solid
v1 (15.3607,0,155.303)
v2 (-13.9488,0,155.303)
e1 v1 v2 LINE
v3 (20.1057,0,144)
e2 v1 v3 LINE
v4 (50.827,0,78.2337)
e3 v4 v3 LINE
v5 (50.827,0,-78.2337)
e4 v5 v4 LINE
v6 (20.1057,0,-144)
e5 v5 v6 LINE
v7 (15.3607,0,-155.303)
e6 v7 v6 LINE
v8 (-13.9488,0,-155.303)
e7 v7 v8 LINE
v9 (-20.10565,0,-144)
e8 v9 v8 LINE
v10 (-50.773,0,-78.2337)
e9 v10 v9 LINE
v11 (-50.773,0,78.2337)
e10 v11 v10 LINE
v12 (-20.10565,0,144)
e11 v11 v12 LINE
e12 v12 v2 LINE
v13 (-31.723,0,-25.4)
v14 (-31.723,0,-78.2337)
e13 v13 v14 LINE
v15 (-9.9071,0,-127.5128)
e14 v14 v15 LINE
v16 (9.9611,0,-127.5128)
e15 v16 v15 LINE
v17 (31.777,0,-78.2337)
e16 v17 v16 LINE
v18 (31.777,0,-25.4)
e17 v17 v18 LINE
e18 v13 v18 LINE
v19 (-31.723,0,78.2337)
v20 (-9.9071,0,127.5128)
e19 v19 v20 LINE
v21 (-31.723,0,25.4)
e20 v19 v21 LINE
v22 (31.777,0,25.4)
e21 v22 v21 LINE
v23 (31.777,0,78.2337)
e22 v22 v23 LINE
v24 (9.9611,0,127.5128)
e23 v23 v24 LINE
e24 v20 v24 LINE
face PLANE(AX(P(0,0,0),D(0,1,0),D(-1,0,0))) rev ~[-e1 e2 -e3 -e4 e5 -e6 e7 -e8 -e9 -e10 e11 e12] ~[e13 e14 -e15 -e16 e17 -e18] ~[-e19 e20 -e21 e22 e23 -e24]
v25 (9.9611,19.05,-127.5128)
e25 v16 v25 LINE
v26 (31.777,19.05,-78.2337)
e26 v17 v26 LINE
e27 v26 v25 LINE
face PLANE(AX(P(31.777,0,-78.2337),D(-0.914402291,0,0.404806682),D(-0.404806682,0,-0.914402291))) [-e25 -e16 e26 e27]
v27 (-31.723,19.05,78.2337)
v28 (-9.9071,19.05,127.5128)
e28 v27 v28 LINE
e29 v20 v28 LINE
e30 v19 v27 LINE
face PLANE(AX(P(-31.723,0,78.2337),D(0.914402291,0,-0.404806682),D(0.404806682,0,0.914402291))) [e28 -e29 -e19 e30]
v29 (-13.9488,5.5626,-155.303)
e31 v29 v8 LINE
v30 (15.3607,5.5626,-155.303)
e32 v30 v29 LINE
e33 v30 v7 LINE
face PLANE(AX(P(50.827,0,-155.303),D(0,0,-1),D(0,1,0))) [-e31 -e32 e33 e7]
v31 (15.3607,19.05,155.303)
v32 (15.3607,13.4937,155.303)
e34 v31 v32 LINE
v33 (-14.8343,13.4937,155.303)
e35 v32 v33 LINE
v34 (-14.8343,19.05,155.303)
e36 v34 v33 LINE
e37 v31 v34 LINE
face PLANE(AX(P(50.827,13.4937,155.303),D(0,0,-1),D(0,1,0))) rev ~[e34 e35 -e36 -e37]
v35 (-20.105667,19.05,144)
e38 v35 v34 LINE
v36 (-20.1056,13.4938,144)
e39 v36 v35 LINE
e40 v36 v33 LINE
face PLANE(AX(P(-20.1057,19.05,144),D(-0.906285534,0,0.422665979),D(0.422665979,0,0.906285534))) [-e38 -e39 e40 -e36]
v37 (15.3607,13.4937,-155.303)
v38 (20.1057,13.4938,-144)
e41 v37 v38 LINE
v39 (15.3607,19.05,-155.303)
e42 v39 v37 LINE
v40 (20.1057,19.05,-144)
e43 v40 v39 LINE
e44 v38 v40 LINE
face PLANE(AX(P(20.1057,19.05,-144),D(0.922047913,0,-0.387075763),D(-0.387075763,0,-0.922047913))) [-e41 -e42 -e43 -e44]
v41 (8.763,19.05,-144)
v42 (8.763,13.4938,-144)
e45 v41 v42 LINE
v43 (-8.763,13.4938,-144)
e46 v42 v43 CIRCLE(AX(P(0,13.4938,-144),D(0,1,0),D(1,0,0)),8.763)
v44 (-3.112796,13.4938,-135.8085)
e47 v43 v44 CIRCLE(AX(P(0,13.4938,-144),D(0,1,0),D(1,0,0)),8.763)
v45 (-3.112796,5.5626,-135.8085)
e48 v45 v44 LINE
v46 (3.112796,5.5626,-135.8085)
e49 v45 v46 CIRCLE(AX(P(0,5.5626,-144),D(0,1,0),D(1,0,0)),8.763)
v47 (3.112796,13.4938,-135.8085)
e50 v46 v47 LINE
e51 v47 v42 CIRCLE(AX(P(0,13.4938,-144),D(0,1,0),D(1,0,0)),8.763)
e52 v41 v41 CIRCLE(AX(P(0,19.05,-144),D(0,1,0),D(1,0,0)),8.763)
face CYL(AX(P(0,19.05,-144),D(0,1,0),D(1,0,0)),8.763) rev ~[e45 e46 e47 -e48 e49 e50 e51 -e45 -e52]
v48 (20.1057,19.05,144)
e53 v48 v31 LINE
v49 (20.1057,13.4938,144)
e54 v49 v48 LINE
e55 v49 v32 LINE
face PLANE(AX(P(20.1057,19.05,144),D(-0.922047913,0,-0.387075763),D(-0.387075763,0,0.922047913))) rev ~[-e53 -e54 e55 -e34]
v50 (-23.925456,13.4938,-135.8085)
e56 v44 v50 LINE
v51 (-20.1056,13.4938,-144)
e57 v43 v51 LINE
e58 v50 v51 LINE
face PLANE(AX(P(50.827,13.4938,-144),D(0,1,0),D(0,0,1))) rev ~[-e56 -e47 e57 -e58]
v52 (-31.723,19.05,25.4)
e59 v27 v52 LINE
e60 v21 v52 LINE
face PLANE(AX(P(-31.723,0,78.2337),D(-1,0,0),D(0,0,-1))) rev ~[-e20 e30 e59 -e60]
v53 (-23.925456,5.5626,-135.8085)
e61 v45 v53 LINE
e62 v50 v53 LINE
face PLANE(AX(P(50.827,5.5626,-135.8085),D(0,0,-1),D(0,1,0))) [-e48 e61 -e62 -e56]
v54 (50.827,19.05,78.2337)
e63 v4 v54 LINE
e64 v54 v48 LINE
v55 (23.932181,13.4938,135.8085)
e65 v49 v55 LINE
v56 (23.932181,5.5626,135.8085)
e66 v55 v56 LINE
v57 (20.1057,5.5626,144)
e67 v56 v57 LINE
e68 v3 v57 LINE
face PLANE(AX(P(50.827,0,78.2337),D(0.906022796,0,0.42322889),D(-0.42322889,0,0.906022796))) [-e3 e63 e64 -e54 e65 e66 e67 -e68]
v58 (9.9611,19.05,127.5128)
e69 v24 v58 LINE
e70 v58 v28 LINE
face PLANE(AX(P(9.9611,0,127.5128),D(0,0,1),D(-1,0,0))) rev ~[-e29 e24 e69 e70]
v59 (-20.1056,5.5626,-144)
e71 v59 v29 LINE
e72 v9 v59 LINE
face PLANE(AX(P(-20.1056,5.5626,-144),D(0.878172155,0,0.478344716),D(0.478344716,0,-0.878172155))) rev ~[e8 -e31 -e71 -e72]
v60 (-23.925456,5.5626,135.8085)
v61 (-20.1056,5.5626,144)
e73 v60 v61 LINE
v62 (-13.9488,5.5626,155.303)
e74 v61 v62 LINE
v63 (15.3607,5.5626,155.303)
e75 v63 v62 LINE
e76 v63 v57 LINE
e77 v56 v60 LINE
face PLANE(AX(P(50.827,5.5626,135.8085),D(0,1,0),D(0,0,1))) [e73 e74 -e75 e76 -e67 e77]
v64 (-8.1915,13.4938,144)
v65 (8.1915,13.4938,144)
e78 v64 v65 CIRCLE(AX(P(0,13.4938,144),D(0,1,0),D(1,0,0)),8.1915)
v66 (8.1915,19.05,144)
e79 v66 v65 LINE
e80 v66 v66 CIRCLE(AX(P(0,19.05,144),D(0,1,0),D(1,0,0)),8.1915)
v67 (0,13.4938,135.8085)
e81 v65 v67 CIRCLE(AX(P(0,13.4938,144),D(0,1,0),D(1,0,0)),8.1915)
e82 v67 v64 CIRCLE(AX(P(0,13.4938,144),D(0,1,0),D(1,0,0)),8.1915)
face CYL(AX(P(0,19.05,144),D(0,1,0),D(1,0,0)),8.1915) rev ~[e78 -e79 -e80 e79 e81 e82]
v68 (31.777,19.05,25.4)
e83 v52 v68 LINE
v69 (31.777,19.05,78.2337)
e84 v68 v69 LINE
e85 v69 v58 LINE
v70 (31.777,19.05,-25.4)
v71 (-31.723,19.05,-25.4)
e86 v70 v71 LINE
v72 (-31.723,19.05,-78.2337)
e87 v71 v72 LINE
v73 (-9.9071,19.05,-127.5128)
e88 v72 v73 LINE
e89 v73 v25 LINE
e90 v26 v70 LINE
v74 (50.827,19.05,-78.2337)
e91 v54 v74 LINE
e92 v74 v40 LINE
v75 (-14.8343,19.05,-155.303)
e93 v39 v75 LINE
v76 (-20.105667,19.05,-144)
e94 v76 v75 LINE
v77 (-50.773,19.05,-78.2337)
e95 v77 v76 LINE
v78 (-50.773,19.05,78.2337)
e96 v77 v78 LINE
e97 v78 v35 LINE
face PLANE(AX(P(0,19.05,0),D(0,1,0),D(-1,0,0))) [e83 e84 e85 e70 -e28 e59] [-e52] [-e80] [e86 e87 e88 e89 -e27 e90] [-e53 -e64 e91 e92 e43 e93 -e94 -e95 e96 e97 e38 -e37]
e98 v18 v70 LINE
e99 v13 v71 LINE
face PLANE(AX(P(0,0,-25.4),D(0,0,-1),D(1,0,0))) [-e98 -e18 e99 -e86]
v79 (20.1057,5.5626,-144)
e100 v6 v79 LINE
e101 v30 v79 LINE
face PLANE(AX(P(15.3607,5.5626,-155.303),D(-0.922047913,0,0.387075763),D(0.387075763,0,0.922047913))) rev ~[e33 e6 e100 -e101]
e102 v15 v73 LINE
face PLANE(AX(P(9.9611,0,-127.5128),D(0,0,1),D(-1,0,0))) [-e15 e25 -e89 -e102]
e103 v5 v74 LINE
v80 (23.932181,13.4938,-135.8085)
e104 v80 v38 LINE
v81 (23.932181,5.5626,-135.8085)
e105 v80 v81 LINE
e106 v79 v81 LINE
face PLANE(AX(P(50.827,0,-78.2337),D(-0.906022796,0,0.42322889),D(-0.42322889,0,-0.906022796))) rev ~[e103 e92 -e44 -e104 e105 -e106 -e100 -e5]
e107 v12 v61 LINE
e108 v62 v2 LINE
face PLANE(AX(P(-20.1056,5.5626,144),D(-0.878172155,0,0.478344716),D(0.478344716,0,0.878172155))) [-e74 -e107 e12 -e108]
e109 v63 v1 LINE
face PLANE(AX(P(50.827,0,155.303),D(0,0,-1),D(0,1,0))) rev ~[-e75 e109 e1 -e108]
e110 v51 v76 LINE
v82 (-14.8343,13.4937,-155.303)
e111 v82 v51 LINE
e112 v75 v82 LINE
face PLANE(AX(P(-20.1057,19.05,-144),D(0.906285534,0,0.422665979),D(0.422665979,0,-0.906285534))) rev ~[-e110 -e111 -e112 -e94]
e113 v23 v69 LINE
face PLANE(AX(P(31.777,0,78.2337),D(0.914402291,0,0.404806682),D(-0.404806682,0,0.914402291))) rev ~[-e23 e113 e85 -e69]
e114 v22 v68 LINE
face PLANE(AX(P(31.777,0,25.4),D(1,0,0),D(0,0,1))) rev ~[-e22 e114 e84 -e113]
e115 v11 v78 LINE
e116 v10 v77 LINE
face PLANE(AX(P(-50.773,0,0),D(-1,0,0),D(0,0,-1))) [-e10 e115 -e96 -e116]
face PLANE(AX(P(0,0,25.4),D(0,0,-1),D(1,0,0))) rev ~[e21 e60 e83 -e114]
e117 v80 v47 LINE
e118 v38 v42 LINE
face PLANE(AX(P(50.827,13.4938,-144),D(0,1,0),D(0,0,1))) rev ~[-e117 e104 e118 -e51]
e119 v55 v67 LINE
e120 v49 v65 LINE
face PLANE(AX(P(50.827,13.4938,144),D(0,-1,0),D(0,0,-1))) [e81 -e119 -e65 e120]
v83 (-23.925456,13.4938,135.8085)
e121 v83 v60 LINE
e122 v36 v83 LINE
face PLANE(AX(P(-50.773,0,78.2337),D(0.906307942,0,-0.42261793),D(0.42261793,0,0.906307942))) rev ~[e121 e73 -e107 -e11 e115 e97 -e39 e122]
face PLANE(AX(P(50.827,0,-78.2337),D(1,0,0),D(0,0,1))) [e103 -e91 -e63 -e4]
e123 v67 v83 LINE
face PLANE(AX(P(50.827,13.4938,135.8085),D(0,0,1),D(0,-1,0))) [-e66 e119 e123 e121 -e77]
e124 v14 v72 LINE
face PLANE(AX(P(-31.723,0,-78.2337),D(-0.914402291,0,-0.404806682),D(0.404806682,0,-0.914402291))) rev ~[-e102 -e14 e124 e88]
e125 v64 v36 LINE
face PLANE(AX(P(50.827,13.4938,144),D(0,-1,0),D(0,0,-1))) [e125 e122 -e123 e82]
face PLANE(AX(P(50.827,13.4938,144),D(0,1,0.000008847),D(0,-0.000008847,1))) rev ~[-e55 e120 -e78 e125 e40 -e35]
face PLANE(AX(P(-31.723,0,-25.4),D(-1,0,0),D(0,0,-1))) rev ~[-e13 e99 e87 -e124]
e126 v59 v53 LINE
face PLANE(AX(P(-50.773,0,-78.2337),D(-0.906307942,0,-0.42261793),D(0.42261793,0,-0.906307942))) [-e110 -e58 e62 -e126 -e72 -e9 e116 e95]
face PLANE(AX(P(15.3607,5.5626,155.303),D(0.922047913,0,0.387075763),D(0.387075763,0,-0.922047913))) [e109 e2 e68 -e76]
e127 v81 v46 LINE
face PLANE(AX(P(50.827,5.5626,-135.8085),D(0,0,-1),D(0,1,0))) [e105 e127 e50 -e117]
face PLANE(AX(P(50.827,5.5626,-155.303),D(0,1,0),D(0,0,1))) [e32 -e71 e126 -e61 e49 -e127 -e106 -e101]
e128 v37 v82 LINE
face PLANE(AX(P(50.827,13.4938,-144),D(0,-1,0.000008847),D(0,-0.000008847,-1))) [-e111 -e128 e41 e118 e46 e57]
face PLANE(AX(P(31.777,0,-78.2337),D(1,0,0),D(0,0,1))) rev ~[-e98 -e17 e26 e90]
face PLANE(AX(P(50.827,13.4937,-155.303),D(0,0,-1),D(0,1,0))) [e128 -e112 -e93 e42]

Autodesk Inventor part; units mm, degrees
ref_plane "YZ Plane" through (0, 0, 0) normal (1, 0, 0) x (0, 1, 0)
ref_plane "XZ Plane" through (0, 0, 0) normal (0, 1, 0) x (-1, 0, 0)
ref_plane "XY Plane" through (0, 0, 0) normal (0, 0, 1) x (1, 0, 0)
sketch "Sketch1" plane through (0, 0, 0) normal (0, 1, 0) x (-1, 0, 0)
  line L0 (0, -213.8682) -> (0, 213.8682) projected
  line L1 (20.1057, -144) -> (-20.1057, -144)
  line L2 (-50.827, -78.2337) -> (-50.827, 78.2337)
  line L3 (-20.1057, 144) -> (20.1057, 144)
  line L4 (50.773, 78.2337) -> (50.773, -78.2337)
  line L5 (158.1712, 0) -> (-85.66, 0) projected
  line L6 (50.773, 78.2337) -> (20.1057, 144)
  line L7 (50.773, 78.2337) -> (123.3381, 78.2337) construction
  line L8 (-50.827, 78.2337) -> (-20.1057, 144)
  line L9 (-20.1057, 144) -> (20.1057, 144)
  line L10 (31.723, 78.2337) -> (31.723, -78.2337)
  line L11 (-31.777, -78.2337) -> (-31.777, 78.2337)
  line L12 (-20.1057, -144) -> (20.1057, -144)
  line L13 (50.773, -78.2337) -> (20.1057, -144)
  line L14 (-50.827, -78.2337) -> (-20.1057, -144)
  line L15 (31.723, -25.4) -> (31.723, 25.4)
  line L16 (31.723, -25.4) -> (-31.777, -25.4)
  line L17 (31.723, 25.4) -> (-31.777, 25.4)
  line L18 (31.723, 78.2337) -> (9.9071, 127.5128)
  line L19 (-31.777, 78.2337) -> (-9.9611, 127.5128)
  line L20 (-9.9611, 127.5128) -> (9.9071, 127.5128)
  line L21 (50.773, 78.2337) -> (31.723, 78.2337)
  line L22 (-31.777, 78.2337) -> (-50.827, 78.2337)
  line L23 (31.723, -78.2337) -> (9.9071, -127.5128)
  line L24 (-31.777, -78.2337) -> (-9.9611, -127.5128)
  line L25 (-9.9611, -127.5128) -> (9.9071, -127.5128)
  line L26 (50.773, -78.2337) -> (31.723, -78.2337)
  line L27 (-31.777, -78.2337) -> (-50.827, -78.2337)
  point P0 (50.8, -140)
  point P1 (-50.8, 140)
  point P2 (-50.8, -140)
  dimension "d49" = 280
  dimension "d51" = 115
  dimension "d52" = 101.6
  dimension "d53" = 50.8
  dimension "d71" = 288
extrude "Extrusion1" add sketch "Sketch1" along normal blind 19.05 contours L1 L14 L27 L24 L25 L0 | L0 L25 L23 L26 L13 L1 | L16 L11 L5 L0 | L0 L5 L10 L16 | L26 L10 L5 L4 | L2 L5 L11 L27 | L5 L11 L17 L0 | L0 L17 L10 L5 | L5 L10 L21 L4 | L2 L22 L11 L5 | L21 L18 L20 L0 L3 L6 | L8 L3 L0 L20 L19 L22
sketch "Sketch9" plane through (50.827, 0, 78.2337) normal (1, 0, 0) x (0, 0, -1)
  line L0 (-65.7663, 19.05) -> (0, 19.05) projected
  line L1 (-65.7663, 19.05) -> (-65.7663, 0)
  line L2 (-65.7663, 0) -> (-65.7663, 19.05) projected
  line L3 (-65.7663, 9.525) -> (-52.4585, 9.525)
  line L4 (-65.7663, 13.4938) -> (-65.7663, 5.5563)
  line L5 (-65.7663, 19.05) -> (-77.0693, 19.05)
  line L6 (-65.7663, 19.05) -> (-54.4633, 19.05) construction
  line L7 (-65.7663, 13.4938) -> (-77.0693, 13.4937)
  line L8 (-77.0693, 13.4937) -> (-77.0693, 19.05)
  line L9 (-65.7663, 19.05) -> (-65.7663, 13.4938)
  line L10 (78.2337, -3.81) -> (78.2337, 22.86) projected
  line L11 (222.2337, 19.05) -> (233.5367, 19.05)
  line L12 (222.2337, 13.4938) -> (233.5367, 13.4937)
  line L13 (233.5367, 13.4937) -> (233.5367, 19.05)
  line L14 (222.2337, 19.05) -> (222.2337, 13.4938)
  point P0 (78.2337, 0)
  dimension "d55" = 7.9375
  dimension "d56" = 11.303
  dimension "d57" = 180
extrude "Extrusion9" add sketch "Sketch9" against normal up to surface (70.9326 mm away)
sketch "Sketch10" plane through (0, 19.05, 0) normal (0, 1, 0) x (1, 0, 0)
  line L0 (20.1057, -144) -> (50.827, -78.2337) projected
  line L1 (20.1057, -144) -> (15.3607, -155.303)
  line L2 (50.827, -155.303) -> (-20.1057, -155.303) projected
  line L3 (15.3607, -155.303) -> (50.53, -155.303)
  line L4 (50.827, -144) -> (20.1057, -144) projected
  line L5 (20.1057, -144) -> (50.827, -144)
  line L6 (50.827, -144) -> (50.827, -155.303) projected
  line L7 (50.827, -144) -> (50.827, -155.303)
  line L8 (50.827, -155.303) -> (50.827, -144)
  line L9 (50.827, -155.303) -> (15.3607, -155.303)
  line L10 (-71.093, 0) -> (71.147, 0) projected
  line L11 (20.1057, 144) -> (15.3607, 155.303)
  line L12 (15.3607, 155.303) -> (50.53, 155.303)
  line L13 (50.827, 144) -> (20.1057, 144)
  line L14 (20.1057, 144) -> (50.827, 144)
  line L15 (50.827, 144) -> (50.827, 155.303)
  line L16 (50.827, 144) -> (50.827, 155.303)
  line L17 (50.827, 155.303) -> (50.827, 144)
  line L18 (50.827, 155.303) -> (15.3607, 155.303)
  line L19 (-20.1057, -144) -> (-14.8343, -155.303)
  line L20 (-20.1057, -155.303) -> (-14.8343, -155.303)
  line L21 (-50.773, -78.2337) -> (-20.1057, -144) projected
  line L22 (-20.1057, -155.303) -> (-20.1057, -144)
  line L23 (-20.1057, 144) -> (-14.8343, 155.303)
  line L24 (-20.1057, 155.303) -> (-14.8343, 155.303)
  line L25 (-20.1057, 155.303) -> (-20.1057, 144)
  point P0 (0, 0)
extrude "Extrusion10" cut sketch "Sketch10" against normal up to surface (19.05 mm away)
sketch "Sketch11" plane through (50.827, 0, 78.2337) normal (1, 0, 0) x (0, 0, -1)
  line L0 (-65.7663, 0) -> (-65.7663, 13.4938) projected
  line L1 (-65.7663, 0) -> (-77.0693, 0)
  line L2 (-77.0693, 0) -> (-77.0693, 5.5626)
  line L3 (-77.0693, 5.5626) -> (-65.7663, 5.5626)
  line L4 (-77.0693, 19.05) -> (-65.7663, 19.05) projected
  line L5 (78.2337, -3.81) -> (78.2337, 22.86) projected
  line L6 (222.2337, 0) -> (233.5367, 0)
  line L7 (233.5367, 0) -> (233.5367, 5.5626)
  line L8 (233.5367, 5.5626) -> (222.2337, 5.5626)
  line L9 (222.2337, 0) -> (222.2337, 13.4938) projected
  line L10 (222.2337, 5.5626) -> (222.2337, 0)
  point P0 (78.2337, 0)
  dimension "d63" = 5.5626
  dimension "d76" = 11.303
extrude "Extrusion11" add sketch "Sketch11" against normal up to surface (70.9326 mm away)
sketch "Sketch12" plane through (50.827, 5.5626, -144) normal (0, 1, 0) x (1, 0, 0)
  line L0 (-70.9326, 11.303) -> (-70.9326, 0) projected
  line L1 (-70.9326, 11.303) -> (-70.9326, 0)
  line L2 (-70.9326, 0) -> (-64.7758, 11.303)
  line L3 (-64.7758, 11.303) -> (-70.9326, 11.303)
  line L4 (-35.4663, 11.303) -> (-65.6612, 11.303) projected
  line L5 (-35.4663, 11.303) -> (-30.7213, 0)
  line L6 (0, 0) -> (0, 11.303) projected
  line L7 (-30.7213, 0) -> (0, 0)
  line L8 (0, 0) -> (0, 11.303)
  line L9 (0, 11.303) -> (-35.4663, 11.303)
  line L10 (-121.92, -144) -> (20.32, -144) projected
  line L11 (-70.9326, -299.303) -> (-70.9326, -288)
  line L12 (-70.9326, -299.303) -> (-70.9326, -288)
  line L13 (-70.9326, -288) -> (-64.7758, -299.303)
  line L14 (-64.7758, -299.303) -> (-70.9326, -299.303)
  line L15 (-35.4663, -299.303) -> (-65.6612, -299.303)
  line L16 (-35.4663, -299.303) -> (-30.7213, -288)
  line L17 (0, -288) -> (0, -299.303)
  line L18 (-30.7213, -288) -> (0, -288)
  line L19 (0, -288) -> (0, -299.303)
  line L20 (0, -299.303) -> (-35.4663, -299.303)
  point P0 (-50.827, -144)
extrude "Extrusion12" cut sketch "Sketch12" against normal through all
sketch "Sketch13" plane through (0, 19.05, 0) normal (0, 1, 0) x (1, 0, 0)
  circle A0 centre (0, -144) radius 8.1915
  circle A1 centre (0, 144) radius 8.763
  line L0 (-71.093, 0) -> (71.147, 0) projected
  point P0 (0, 0)
  dimension "d68" = 16.383
  dimension "d69" = 17.526
  dimension "d70" = 288
extrude "Extrusion13" cut sketch "Sketch13" against normal up to surface (13.4874 mm away)
sketch "Sketch14" plane through (50.827, 0, 78.2337) normal (1, 0, 0) x (0, 0, -1)
  line L0 (-57.5748, 19.05) -> (-57.5748, 5.5626) projected
  line L1 (-57.5748, 19.05) -> (-57.5748, 5.5626) projected
  line L2 (-57.5748, 19.05) -> (-57.5748, 5.5626) projected
  line L3 (-65.7663, 13.4938) -> (-57.5748, 13.4938)
  line L4 (-57.5748, 5.5626) -> (-57.5748, 13.4938)
  line L5 (-65.7663, 5.5626) -> (-65.7663, 13.4938) projected
  line L6 (-57.5748, 5.5626) -> (-65.7663, 5.5626)
  line L7 (78.2337, -3.81) -> (78.2337, 22.86) projected
  line L8 (222.2337, 13.4938) -> (214.0422, 13.4938)
  line L9 (214.0422, 5.5626) -> (214.0422, 13.4938)
  line L10 (222.2337, 5.5626) -> (222.2337, 13.4938)
  line L11 (214.0422, 5.5626) -> (222.2337, 5.5626)
  point P0 (78.2337, 0)
extrude "Extrusion14" cut sketch "Sketch14" against normal through all
properties part number "Diff_BarV2"
